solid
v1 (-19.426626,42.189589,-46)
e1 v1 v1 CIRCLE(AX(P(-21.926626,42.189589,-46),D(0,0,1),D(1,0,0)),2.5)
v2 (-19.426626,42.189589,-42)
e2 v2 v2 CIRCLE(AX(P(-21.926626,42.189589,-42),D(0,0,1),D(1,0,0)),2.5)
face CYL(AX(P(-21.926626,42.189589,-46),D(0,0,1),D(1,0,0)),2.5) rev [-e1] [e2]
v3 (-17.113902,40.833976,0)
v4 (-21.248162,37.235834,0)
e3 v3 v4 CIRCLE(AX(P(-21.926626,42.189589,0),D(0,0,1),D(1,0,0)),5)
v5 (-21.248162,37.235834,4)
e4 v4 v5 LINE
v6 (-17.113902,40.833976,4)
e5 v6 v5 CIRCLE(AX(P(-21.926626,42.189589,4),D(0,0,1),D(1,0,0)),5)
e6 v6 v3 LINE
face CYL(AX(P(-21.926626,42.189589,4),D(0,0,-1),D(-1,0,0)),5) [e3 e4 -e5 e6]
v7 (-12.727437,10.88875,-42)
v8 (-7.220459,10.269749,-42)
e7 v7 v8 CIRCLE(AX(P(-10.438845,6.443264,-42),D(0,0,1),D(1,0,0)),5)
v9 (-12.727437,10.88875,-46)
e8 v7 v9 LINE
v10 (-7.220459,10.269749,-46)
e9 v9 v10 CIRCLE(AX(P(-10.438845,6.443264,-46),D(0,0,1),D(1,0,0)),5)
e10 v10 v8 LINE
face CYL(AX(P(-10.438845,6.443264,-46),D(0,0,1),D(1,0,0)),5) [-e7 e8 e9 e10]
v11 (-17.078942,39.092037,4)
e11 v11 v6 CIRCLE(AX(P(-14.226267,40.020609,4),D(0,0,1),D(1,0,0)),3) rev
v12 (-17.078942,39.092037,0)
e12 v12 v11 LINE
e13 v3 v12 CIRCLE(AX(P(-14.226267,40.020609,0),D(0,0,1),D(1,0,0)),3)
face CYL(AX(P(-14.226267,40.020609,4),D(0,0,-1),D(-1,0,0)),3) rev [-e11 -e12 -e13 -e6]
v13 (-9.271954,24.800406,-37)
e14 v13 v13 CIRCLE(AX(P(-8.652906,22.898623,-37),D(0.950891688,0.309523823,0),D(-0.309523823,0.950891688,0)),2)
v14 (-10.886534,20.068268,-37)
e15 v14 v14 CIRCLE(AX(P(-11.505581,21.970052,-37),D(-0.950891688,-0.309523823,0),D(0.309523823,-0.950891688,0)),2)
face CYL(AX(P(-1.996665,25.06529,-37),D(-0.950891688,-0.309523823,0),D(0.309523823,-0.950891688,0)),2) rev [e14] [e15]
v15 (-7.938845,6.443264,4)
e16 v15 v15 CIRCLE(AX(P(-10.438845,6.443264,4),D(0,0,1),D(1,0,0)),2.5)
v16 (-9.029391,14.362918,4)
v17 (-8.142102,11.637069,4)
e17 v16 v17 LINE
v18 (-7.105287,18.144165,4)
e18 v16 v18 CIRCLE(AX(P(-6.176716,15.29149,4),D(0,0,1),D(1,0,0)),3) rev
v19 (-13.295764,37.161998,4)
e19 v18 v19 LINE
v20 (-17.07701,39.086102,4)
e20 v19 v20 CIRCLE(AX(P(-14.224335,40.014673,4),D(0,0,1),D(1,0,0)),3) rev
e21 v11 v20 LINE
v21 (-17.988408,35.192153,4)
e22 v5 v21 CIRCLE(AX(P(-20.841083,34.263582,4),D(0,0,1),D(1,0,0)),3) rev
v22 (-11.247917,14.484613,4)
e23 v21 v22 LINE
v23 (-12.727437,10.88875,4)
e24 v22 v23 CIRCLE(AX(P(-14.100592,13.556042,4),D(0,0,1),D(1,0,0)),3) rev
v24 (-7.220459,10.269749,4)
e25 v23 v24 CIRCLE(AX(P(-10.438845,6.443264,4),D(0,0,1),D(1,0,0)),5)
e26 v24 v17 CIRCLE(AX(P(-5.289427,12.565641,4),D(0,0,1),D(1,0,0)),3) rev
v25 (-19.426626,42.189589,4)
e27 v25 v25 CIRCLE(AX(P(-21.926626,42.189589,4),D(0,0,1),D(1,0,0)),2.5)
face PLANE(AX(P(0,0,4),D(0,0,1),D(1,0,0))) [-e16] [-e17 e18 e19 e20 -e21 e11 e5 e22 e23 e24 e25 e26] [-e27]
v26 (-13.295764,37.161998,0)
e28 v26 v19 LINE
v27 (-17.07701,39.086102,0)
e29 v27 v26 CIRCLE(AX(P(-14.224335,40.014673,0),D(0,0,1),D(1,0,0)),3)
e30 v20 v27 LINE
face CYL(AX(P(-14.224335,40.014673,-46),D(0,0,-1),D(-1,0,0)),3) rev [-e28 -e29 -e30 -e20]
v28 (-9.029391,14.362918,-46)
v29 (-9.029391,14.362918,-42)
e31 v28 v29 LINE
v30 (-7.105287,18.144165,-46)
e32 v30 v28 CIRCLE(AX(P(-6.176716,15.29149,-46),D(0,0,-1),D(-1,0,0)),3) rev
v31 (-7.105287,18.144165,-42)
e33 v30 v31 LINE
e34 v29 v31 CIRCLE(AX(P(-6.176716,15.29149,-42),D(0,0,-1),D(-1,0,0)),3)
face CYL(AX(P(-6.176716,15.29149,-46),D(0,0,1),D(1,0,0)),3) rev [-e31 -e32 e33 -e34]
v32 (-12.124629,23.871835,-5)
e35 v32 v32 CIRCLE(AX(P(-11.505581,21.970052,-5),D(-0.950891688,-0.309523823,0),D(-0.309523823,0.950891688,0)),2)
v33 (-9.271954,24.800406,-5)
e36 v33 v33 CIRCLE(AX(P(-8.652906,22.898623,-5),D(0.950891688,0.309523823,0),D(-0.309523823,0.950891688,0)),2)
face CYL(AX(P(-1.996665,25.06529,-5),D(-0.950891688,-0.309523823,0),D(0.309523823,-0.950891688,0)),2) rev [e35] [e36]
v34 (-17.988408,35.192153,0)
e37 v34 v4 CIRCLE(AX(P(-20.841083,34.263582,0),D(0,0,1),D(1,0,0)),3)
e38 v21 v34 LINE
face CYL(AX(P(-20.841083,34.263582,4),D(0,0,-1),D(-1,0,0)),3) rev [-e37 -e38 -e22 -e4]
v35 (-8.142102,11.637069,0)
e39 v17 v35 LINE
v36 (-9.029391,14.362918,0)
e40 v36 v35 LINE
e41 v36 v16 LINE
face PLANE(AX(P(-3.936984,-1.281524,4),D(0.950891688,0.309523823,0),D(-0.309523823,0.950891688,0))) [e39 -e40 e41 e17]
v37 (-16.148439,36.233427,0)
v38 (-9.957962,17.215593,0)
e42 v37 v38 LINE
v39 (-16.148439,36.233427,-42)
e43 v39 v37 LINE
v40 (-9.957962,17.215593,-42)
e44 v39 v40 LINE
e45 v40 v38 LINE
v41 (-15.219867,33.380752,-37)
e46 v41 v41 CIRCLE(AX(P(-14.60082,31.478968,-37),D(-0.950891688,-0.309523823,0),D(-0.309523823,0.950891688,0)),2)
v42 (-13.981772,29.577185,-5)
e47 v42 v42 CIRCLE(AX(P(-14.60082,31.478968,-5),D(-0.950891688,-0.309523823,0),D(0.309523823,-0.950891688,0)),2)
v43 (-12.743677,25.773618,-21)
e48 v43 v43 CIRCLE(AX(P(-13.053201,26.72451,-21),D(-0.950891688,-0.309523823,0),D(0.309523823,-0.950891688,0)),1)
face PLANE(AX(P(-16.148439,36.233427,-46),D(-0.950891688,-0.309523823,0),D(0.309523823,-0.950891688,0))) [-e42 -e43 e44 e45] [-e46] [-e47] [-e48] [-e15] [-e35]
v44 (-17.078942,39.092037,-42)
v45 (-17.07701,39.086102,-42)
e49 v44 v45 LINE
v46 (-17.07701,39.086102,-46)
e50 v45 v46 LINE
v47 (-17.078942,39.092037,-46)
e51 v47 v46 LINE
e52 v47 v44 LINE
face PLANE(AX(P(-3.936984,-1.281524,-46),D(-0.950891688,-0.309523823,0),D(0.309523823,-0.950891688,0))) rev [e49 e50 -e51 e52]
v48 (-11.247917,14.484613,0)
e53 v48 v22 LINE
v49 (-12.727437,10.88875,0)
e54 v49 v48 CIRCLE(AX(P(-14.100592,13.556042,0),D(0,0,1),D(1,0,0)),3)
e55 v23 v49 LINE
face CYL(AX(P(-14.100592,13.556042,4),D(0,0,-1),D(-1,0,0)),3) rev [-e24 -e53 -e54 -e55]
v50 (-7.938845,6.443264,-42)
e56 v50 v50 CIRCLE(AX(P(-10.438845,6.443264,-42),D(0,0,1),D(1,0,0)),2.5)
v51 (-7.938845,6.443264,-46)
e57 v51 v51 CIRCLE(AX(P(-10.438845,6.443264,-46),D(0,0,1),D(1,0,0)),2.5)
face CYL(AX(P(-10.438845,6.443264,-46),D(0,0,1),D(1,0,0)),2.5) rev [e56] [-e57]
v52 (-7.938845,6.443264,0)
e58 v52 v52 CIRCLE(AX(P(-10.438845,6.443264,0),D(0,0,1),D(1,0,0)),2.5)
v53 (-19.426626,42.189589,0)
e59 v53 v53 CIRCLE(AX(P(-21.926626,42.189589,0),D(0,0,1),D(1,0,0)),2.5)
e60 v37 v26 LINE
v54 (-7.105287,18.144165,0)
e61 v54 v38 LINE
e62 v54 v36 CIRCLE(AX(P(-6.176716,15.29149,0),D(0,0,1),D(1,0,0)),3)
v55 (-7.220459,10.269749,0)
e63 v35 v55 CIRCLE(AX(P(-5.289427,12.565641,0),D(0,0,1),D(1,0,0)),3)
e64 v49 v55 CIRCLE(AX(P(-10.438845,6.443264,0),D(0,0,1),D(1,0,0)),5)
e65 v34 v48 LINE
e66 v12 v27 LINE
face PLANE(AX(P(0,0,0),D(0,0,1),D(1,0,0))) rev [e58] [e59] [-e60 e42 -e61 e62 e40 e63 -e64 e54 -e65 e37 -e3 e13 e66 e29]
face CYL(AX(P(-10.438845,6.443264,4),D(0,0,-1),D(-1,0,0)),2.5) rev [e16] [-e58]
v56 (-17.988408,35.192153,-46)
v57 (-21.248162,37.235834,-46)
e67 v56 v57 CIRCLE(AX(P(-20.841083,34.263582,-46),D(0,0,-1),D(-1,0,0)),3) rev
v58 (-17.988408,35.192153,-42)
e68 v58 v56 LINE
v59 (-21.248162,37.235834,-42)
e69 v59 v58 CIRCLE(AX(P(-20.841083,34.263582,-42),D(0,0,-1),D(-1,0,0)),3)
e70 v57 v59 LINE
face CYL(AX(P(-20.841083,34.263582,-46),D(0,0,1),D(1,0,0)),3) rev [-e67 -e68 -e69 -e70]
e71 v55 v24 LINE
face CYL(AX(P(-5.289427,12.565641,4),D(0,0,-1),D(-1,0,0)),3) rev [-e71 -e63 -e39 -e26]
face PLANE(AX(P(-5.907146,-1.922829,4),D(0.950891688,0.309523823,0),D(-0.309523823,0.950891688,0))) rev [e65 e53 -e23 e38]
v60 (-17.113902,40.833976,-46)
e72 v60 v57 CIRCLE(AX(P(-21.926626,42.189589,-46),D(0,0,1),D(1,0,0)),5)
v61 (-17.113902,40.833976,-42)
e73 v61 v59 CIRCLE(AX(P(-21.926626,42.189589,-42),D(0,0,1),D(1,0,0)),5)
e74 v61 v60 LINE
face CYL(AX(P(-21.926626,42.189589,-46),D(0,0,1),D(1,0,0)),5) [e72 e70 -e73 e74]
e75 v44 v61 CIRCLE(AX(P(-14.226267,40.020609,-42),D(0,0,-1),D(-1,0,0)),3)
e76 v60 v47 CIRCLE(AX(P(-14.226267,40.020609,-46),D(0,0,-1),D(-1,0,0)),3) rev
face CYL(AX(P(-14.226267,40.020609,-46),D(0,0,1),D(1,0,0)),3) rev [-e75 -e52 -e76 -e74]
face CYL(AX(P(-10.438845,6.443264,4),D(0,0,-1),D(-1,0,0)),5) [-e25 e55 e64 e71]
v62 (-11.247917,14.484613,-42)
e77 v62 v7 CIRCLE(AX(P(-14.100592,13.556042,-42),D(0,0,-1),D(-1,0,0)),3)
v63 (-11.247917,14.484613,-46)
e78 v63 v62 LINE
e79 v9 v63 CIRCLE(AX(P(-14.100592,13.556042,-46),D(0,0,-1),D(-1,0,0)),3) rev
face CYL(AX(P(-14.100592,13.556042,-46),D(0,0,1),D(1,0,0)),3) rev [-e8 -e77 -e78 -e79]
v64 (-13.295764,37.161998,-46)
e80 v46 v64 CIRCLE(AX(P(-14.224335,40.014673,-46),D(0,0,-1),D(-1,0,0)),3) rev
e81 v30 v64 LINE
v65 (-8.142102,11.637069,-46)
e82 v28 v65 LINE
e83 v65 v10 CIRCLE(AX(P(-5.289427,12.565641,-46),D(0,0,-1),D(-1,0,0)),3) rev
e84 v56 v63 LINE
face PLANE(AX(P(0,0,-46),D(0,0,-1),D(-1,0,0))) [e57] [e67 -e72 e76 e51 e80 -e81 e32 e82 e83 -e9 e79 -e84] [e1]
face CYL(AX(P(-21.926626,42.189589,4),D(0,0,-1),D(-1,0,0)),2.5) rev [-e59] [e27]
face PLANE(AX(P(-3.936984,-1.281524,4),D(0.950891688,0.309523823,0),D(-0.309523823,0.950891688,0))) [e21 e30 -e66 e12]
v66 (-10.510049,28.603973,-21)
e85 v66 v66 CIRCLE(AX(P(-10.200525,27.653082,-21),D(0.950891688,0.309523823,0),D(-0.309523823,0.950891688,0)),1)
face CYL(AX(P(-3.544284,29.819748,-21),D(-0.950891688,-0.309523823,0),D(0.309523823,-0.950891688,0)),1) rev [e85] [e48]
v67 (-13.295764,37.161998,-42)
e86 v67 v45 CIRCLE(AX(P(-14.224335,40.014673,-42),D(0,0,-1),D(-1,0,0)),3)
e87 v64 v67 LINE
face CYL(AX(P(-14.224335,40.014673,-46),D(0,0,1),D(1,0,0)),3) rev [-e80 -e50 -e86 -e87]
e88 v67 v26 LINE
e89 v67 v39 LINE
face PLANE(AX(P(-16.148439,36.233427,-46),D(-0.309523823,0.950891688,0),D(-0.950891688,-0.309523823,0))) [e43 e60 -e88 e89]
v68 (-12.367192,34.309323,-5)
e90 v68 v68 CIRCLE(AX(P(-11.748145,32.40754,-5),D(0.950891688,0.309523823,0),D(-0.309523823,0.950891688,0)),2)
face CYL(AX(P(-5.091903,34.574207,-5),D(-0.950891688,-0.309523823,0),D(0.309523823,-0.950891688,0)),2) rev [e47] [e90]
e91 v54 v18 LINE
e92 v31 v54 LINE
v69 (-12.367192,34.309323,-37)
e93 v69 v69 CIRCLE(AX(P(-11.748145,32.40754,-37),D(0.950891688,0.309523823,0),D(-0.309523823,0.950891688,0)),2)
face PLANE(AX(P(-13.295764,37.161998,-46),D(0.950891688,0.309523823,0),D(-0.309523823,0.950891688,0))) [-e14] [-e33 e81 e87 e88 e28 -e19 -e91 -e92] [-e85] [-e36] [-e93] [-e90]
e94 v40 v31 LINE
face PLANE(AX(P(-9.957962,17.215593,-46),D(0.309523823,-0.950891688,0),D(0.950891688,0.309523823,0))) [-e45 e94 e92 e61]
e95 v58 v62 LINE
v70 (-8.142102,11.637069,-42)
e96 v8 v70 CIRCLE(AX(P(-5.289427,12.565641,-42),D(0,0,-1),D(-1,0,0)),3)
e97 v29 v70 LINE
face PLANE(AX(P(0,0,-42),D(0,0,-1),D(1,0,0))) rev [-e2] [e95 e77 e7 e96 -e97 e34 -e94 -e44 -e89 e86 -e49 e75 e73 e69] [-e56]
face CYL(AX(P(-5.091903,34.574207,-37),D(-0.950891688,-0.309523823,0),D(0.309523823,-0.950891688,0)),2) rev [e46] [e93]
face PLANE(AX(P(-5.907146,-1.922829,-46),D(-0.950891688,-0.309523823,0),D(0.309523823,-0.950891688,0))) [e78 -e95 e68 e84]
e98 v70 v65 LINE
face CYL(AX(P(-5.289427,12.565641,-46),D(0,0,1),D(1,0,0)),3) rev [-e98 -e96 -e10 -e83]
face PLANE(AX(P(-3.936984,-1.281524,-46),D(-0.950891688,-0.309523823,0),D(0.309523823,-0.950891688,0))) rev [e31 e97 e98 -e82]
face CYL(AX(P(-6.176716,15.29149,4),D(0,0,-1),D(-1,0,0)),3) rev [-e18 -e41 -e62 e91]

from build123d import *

# Parameters (mm, degrees)
SKETCH1_R           = 2.5
BOSS_EXTRUDE1_DEPTH = 4
BOSS_EXTRUDE2_DEPTH = 50
SKETCH3_R           = 2
SKETCH3_R_2         = 1
CUT_EXTRUDE1_DEPTH  = 10
FILLET1_R           = 3


with BuildPart() as part:
    # Sketch1 → Boss-Extrude1 (new body)
    with BuildSketch(Plane.XY):
        with BuildLine():
            Line((-7.842362425, 10.716234493), (-17.397624454, 40.071064625))
            ThreePointArc((-17.397624454, 40.071064625), (-25.795005306, 45.357497095), (-18.956793202, 38.167140452))
            Line((-18.956793202, 38.167140452), (-18.754238897, 37.544871045))
            Line((-18.754238897, 37.544871045), (-10.63810017, 12.611188123))
            Line((-10.63810017, 12.611188123), (-10.256851829, 11.439950722))
            ThreePointArc((-10.256851829, 11.439950722), (-11.874437039, 1.653788416), (-7.842362425, 10.716234493))
        make_face()
        with Locations((-10.438845238, 6.44326398)):
            Circle(SKETCH1_R, mode=Mode.SUBTRACT)
        with Locations((-21.926625837, 42.189589224)):
            Circle(SKETCH1_R, mode=Mode.SUBTRACT)
    boss_extrude1 = extrude(amount=BOSS_EXTRUDE1_DEPTH)

    # Sketch2 → Boss-Extrude2 (add)
    with BuildSketch(Plane.XY.offset(4)):
        Polygon((-16.14843876, 36.233426921), (-9.957962302, 17.215593153), (-7.105287237, 18.144164622), (-13.295763695, 37.161998389), align=None)
    extrude(amount=-BOSS_EXTRUDE2_DEPTH)

    # Mirror1: Boss-Extrude1 across plane
    add(boss_extrude1.mirror(Plane.XY.offset(-21)))

    # Sketch3 → Cut-Extrude1 (cut)
    with BuildSketch(Plane(origin=(-3.936983875, -1.281523768, 0), x_dir=(0, 0, 1), z_dir=(-0.950891688393093, -0.30952382290371966, 0))):
        with Locations(Location((-5, 34.452391, 0), (0, 0, 270))):
            Circle(SKETCH3_R)
        with Locations(Location((-5, 24.452391, 0), (0, 0, 90))):
            Circle(SKETCH3_R)
        with Locations(Location((-37, 24.452391, 0), (0, 0, 270))):
            Circle(SKETCH3_R)
        with Locations(Location((-37, 34.452391, 0), (0, 0, 90))):
            Circle(SKETCH3_R)
        with Locations(Location((-21, 29.452391, 0), (0, 0, 270))):
            Circle(SKETCH3_R_2)
    extrude(amount=-CUT_EXTRUDE1_DEPTH, mode=Mode.SUBTRACT)

    # Fillet1
    fillet1_edges = [part.edges().sort_by_distance(p)[0] for p in [
        (-9.957962302, 17.215593153, 2),
        (-9.957962302, 17.215593153, -44),
        (-16.14843876, 36.233426921, -44),
        (-16.14843876, 36.233426921, 2),
        (-10.256851829, 11.439950722, 2),
        (-7.842362425, 10.716234493, 2),
        (-7.842362425, 10.716234493, -44),
        (-10.256851829, 11.439950722, -44),
        (-17.397624454, 40.071064625, -44),
        (-18.956793202, 38.167140452, -44),
        (-17.397624454, 40.071064625, 2),
        (-18.956793202, 38.167140452, 2),
    ]]
    fillet(fillet1_edges, radius=FILLET1_R - 0.0001)  # a hair under: the kernel refuses the full size


solid = part.part
